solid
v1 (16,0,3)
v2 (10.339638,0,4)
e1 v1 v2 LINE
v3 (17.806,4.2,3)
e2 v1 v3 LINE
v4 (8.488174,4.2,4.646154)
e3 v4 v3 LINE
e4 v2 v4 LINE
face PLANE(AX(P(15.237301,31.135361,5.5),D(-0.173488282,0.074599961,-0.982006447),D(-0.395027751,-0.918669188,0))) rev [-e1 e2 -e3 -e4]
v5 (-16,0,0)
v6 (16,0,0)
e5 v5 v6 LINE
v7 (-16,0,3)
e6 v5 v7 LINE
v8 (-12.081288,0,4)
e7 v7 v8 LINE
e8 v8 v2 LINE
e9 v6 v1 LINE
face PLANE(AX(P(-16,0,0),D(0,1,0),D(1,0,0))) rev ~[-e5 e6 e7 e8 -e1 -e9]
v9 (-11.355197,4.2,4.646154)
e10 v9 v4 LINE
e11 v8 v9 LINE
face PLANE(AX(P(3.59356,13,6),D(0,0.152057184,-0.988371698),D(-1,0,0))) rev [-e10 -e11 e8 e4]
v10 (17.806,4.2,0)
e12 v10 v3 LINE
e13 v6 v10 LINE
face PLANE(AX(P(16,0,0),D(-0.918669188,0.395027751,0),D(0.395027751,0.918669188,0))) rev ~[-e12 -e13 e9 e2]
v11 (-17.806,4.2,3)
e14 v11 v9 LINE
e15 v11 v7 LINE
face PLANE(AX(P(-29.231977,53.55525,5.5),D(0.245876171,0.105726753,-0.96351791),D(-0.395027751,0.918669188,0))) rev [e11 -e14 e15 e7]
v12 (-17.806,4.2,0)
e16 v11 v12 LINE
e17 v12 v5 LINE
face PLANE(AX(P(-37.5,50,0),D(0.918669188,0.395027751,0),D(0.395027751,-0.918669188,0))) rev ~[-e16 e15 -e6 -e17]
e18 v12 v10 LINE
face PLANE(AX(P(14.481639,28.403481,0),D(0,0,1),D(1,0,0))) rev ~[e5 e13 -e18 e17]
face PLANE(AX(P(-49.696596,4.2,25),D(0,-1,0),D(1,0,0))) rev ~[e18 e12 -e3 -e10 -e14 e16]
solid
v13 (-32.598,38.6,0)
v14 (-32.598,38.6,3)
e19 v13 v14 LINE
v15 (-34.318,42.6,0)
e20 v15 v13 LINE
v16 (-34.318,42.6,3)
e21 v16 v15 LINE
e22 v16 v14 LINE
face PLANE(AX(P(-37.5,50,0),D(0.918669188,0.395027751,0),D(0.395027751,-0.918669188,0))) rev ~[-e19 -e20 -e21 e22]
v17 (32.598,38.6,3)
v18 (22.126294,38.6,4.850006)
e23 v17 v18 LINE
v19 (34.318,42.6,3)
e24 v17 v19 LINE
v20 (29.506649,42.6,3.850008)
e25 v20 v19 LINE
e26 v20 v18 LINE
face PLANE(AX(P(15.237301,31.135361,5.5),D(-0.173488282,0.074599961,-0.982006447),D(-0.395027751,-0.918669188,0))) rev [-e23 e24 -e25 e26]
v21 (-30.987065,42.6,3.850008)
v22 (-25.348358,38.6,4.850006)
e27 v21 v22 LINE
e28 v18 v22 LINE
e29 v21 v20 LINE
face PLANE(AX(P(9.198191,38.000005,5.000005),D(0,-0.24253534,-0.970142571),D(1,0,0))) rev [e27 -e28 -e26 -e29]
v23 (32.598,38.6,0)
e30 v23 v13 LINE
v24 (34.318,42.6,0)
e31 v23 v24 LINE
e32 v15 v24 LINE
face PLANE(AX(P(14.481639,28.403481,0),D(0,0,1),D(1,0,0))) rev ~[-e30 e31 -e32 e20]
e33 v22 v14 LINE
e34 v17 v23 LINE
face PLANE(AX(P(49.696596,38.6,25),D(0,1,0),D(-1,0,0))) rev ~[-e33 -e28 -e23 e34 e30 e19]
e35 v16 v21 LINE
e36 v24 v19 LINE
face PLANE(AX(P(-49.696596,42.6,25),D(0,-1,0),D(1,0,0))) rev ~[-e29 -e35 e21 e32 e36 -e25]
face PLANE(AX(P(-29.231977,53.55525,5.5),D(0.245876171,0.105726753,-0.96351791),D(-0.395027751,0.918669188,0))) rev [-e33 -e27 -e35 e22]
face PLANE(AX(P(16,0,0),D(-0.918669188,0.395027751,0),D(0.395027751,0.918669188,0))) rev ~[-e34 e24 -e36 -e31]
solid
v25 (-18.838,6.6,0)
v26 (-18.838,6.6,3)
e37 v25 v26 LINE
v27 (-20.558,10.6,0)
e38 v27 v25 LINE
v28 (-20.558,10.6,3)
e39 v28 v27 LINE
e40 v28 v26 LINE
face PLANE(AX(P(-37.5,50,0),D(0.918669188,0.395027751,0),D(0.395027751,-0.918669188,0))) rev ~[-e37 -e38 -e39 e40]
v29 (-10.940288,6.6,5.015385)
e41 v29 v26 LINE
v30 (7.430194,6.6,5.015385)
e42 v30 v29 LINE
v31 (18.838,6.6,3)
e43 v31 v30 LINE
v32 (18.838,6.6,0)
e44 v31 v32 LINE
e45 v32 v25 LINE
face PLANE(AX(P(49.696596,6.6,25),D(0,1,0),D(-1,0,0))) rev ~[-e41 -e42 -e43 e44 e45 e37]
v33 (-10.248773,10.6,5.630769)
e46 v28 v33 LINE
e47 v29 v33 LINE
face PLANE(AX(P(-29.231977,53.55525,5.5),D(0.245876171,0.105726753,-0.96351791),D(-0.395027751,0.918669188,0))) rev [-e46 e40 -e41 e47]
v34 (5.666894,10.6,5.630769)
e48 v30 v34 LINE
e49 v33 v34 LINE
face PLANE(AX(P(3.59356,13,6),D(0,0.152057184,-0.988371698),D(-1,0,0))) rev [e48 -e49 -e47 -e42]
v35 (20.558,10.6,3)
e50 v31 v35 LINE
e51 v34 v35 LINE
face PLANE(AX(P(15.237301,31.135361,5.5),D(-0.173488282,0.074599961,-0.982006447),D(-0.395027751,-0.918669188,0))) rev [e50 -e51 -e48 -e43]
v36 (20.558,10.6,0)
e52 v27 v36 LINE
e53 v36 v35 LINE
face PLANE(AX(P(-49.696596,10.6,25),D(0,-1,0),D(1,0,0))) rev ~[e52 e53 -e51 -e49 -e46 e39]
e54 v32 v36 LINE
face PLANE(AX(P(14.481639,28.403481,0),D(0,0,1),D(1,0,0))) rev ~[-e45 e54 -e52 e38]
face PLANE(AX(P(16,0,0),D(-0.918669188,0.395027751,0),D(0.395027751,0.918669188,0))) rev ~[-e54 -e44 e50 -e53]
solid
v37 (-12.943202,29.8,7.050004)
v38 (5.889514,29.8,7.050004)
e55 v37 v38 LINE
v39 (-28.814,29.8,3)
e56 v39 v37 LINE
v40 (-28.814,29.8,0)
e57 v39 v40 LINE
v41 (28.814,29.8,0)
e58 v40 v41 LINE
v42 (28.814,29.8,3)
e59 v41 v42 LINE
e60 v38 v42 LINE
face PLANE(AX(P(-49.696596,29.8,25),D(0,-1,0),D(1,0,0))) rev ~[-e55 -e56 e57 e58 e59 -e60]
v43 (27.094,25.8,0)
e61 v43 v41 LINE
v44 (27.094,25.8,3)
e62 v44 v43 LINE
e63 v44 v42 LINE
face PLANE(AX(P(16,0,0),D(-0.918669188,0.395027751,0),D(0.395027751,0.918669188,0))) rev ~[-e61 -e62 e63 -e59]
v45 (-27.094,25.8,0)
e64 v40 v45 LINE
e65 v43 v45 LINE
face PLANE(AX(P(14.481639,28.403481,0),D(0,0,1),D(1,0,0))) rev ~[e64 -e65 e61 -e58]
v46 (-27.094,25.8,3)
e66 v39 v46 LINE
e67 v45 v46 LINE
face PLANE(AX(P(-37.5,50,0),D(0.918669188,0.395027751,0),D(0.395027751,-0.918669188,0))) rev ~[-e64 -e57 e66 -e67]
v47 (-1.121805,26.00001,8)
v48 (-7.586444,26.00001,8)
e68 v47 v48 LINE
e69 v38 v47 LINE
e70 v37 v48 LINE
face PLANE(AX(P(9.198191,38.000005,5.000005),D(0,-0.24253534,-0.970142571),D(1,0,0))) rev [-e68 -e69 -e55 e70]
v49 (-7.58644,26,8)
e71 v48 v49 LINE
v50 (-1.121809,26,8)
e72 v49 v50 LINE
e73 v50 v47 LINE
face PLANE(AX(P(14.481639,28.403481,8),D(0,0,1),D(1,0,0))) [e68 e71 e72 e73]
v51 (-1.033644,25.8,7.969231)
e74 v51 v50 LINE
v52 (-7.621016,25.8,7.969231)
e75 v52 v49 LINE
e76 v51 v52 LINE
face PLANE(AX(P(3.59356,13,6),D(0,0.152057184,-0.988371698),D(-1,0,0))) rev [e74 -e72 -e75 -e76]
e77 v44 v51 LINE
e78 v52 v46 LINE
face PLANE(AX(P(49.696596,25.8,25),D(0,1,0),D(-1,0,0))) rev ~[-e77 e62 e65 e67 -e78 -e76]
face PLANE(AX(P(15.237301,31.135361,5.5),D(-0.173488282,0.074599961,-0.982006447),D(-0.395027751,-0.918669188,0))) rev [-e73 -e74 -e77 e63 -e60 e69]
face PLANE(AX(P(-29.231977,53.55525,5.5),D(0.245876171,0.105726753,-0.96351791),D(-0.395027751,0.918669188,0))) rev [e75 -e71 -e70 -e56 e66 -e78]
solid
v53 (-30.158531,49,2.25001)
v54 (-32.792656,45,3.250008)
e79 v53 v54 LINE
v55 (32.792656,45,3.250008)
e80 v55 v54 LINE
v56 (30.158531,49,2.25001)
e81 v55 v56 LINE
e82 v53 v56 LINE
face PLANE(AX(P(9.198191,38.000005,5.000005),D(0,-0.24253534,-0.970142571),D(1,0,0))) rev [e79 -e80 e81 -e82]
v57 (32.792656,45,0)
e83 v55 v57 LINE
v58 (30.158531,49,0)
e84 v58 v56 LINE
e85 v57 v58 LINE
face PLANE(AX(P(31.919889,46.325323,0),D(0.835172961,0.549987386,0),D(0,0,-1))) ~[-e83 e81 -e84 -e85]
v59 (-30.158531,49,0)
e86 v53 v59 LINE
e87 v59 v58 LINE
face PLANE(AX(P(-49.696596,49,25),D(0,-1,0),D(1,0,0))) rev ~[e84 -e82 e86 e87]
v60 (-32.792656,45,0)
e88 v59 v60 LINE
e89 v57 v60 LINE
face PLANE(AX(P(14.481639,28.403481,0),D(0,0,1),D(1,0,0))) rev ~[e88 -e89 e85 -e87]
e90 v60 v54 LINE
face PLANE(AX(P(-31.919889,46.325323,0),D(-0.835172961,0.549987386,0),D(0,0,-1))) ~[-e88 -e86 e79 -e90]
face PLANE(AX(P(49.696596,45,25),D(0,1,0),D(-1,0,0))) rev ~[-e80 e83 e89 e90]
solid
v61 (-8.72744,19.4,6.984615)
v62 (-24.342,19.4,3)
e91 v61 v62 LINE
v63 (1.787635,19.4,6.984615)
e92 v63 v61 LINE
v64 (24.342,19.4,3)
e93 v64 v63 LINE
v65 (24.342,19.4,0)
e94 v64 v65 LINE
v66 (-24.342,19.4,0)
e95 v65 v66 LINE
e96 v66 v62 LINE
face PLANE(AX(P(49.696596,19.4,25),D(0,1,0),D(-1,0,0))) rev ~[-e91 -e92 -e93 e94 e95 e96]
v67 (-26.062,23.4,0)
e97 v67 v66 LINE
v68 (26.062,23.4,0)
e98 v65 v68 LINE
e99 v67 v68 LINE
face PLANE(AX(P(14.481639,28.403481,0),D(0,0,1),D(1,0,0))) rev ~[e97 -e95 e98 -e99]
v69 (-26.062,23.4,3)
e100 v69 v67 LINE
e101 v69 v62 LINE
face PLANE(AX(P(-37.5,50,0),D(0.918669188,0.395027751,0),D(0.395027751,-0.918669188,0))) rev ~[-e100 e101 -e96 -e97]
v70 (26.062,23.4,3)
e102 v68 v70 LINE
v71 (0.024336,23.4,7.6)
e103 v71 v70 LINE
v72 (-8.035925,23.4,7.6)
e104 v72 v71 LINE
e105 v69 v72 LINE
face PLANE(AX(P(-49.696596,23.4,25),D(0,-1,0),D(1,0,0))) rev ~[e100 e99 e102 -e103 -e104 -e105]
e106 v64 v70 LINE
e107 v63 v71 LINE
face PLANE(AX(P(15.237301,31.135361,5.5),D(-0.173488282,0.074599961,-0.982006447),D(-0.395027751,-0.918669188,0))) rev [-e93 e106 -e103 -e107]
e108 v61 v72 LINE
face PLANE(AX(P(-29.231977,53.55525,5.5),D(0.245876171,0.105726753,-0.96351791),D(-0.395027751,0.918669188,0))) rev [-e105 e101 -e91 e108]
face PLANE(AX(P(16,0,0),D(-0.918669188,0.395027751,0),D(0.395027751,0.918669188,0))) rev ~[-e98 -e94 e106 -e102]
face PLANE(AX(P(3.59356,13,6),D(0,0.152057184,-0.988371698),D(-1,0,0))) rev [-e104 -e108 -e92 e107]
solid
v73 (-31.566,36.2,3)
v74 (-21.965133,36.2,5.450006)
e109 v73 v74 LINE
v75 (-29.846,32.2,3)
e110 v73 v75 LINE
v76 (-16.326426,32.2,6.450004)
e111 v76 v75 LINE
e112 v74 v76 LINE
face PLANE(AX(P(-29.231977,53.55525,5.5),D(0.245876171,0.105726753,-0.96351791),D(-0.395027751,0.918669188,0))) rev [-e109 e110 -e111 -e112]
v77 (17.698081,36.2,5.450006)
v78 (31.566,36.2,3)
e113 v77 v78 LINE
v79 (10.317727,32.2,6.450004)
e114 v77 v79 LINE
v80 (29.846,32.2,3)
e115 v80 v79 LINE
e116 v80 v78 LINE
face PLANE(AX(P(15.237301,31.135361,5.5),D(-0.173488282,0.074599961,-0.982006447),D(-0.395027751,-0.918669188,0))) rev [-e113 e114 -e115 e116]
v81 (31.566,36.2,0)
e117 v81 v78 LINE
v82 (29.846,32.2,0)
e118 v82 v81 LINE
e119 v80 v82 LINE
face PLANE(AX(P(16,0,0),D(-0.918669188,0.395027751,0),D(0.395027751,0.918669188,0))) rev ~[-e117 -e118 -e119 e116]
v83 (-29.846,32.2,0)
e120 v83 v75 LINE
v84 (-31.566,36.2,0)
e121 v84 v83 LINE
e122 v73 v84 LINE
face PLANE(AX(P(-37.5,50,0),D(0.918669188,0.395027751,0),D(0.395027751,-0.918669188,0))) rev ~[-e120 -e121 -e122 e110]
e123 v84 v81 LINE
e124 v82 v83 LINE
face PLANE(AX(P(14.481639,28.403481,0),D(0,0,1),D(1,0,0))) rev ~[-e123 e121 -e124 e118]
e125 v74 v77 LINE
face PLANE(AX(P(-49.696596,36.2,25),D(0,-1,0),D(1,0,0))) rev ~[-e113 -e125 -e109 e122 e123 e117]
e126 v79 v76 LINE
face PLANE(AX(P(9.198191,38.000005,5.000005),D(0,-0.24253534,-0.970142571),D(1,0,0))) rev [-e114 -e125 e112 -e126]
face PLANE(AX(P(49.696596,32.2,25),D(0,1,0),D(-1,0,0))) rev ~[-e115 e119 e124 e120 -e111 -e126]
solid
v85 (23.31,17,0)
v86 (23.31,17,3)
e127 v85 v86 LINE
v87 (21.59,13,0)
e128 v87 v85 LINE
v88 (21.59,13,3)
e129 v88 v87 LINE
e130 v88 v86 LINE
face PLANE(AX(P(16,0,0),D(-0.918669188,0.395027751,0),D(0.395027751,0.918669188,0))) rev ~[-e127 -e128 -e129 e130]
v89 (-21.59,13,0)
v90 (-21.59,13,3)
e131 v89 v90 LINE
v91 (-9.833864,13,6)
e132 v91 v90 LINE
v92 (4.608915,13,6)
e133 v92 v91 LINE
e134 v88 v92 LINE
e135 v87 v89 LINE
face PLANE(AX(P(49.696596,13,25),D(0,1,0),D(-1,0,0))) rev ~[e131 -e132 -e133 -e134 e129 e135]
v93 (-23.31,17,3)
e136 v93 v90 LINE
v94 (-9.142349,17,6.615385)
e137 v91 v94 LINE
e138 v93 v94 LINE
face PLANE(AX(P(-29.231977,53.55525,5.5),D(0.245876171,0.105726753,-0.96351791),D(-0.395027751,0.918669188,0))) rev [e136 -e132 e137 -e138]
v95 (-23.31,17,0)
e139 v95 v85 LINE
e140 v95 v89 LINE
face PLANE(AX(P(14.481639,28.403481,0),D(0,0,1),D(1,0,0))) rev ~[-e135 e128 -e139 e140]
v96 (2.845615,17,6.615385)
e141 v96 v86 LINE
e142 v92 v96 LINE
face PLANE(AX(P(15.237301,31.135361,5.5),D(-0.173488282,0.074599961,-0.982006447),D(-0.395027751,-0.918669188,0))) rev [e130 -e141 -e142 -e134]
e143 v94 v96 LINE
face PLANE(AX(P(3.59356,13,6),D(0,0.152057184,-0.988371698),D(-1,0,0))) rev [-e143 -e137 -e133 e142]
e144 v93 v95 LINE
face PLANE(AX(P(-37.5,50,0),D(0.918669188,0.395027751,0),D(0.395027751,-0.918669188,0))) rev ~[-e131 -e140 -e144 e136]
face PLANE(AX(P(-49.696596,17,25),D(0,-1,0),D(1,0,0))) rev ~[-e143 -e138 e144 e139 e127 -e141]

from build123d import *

# Parameters (mm, degrees)
F1_DEPTH = 8
F2_SIZE2 = 18
F2_SIZE  = 5
F3_SIZE2 = 26
F3_SIZE  = 4
F4_SIZE2 = 26
F4_SIZE  = 5
F5_SIZE2 = 23.99999
F5_SIZE  = 5.99999
F6_SIZE  = 8
F8_W     = 49.696596037
F8_H     = 2.4
F9_DEPTH = 36.2


# Not quite as in the source:
# - a fillet or chamfer is up to 0.001 mm smaller than in the source, because OpenCascade refuses the exact size


with BuildPart() as f1:
    # F0 (on Top) → F1 (new body)
    with BuildSketch(Plane.XY):
        Polygon((0, 50), (0, 0), (16, 0), (37.5, 50), align=None)
        Polygon((-16, 0), (0, 0), (0, 50), (-37.5, 50), align=None)
    extrude(amount=F1_DEPTH)

    # F2
    f2_edges = [f1.edges().sort_by_distance(p)[0] for p in [
        (-26.75, 25, 8),
    ]]
    f2_side = f1.faces().sort_by_distance((-26.75, 25, 4))[0]
    chamfer(f2_edges, length=F2_SIZE, length2=F2_SIZE2, reference=f2_side)

    # F3
    f3_edges = [f1.edges().sort_by_distance(p)[0] for p in [
        (9.79678, 0, 8),
    ]]
    f3_side = f1.faces().sort_by_distance((2.240499, 0, 3.447889))[0]
    chamfer(f3_edges, length=F3_SIZE, length2=F3_SIZE2, reference=f3_side)

    # F4
    f4_edges = [f1.edges().sort_by_distance(p)[0] for p in [
        (32.34, 38, 8),
    ]]
    f4_side = f1.faces().sort_by_distance((27.799464, 27.440613, 3.601533))[0]
    chamfer(f4_edges, length=F4_SIZE, length2=F4_SIZE2, reference=f4_side)

    # F5 (size 6 and 24 in the source; OpenCascade refuses exactly that, so slightly less here)
    f5_edges = [f1.edges().sort_by_distance(p)[0] for p in [
        (-4.354124, 50, 8),
    ]]
    f5_side = f1.faces().sort_by_distance((-0.976192, 50, 3.418255))[0]
    chamfer(f5_edges, length=F5_SIZE, length2=F5_SIZE2, reference=f5_side)

    # F6
    f6_edges = [f1.edges().sort_by_distance(p)[0] for p in [
        (-37.5, 50, 1.000005),
        (37.5, 50, 1.000005),
    ]]
    chamfer(f6_edges, length=F6_SIZE)

    # F8 (on offset) → F9 (cut)
    with BuildSketch(Plane.XY.offset(25)):
        with Locations((-24.8482980185, 50.2)):
            Rectangle(F8_W, F8_H)
        with Locations((24.8482980185, 50.2)):
            Rectangle(F8_W, F8_H)
        with Locations((24.8482980185, 43.8)):
            Rectangle(F8_W, F8_H)
        with Locations((24.8482980185, 37.4)):
            Rectangle(F8_W, F8_H)
        with Locations((24.8482980185, 31)):
            Rectangle(F8_W, F8_H)
        with Locations((24.8482980185, 24.6)):
            Rectangle(F8_W, F8_H)
        with Locations((24.8482980185, 18.2)):
            Rectangle(F8_W, F8_H)
        with Locations((24.8482980185, 11.8)):
            Rectangle(F8_W, F8_H)
        with Locations((24.8482980185, 5.4)):
            Rectangle(F8_W, F8_H)
        with Locations((-24.8482980185, 5.4)):
            Rectangle(F8_W, F8_H)
        with Locations((-24.8482980185, 11.8)):
            Rectangle(F8_W, F8_H)
        with Locations((-24.8482980185, 18.2)):
            Rectangle(F8_W, F8_H)
        with Locations((-24.8482980185, 24.6)):
            Rectangle(F8_W, F8_H)
        with Locations((-24.8482980185, 31)):
            Rectangle(F8_W, F8_H)
        with Locations((-24.8482980185, 37.4)):
            Rectangle(F8_W, F8_H)
        with Locations((-24.8482980185, 43.8)):
            Rectangle(F8_W, F8_H)
    extrude(amount=-F9_DEPTH, mode=Mode.SUBTRACT)


solid = f1.part
